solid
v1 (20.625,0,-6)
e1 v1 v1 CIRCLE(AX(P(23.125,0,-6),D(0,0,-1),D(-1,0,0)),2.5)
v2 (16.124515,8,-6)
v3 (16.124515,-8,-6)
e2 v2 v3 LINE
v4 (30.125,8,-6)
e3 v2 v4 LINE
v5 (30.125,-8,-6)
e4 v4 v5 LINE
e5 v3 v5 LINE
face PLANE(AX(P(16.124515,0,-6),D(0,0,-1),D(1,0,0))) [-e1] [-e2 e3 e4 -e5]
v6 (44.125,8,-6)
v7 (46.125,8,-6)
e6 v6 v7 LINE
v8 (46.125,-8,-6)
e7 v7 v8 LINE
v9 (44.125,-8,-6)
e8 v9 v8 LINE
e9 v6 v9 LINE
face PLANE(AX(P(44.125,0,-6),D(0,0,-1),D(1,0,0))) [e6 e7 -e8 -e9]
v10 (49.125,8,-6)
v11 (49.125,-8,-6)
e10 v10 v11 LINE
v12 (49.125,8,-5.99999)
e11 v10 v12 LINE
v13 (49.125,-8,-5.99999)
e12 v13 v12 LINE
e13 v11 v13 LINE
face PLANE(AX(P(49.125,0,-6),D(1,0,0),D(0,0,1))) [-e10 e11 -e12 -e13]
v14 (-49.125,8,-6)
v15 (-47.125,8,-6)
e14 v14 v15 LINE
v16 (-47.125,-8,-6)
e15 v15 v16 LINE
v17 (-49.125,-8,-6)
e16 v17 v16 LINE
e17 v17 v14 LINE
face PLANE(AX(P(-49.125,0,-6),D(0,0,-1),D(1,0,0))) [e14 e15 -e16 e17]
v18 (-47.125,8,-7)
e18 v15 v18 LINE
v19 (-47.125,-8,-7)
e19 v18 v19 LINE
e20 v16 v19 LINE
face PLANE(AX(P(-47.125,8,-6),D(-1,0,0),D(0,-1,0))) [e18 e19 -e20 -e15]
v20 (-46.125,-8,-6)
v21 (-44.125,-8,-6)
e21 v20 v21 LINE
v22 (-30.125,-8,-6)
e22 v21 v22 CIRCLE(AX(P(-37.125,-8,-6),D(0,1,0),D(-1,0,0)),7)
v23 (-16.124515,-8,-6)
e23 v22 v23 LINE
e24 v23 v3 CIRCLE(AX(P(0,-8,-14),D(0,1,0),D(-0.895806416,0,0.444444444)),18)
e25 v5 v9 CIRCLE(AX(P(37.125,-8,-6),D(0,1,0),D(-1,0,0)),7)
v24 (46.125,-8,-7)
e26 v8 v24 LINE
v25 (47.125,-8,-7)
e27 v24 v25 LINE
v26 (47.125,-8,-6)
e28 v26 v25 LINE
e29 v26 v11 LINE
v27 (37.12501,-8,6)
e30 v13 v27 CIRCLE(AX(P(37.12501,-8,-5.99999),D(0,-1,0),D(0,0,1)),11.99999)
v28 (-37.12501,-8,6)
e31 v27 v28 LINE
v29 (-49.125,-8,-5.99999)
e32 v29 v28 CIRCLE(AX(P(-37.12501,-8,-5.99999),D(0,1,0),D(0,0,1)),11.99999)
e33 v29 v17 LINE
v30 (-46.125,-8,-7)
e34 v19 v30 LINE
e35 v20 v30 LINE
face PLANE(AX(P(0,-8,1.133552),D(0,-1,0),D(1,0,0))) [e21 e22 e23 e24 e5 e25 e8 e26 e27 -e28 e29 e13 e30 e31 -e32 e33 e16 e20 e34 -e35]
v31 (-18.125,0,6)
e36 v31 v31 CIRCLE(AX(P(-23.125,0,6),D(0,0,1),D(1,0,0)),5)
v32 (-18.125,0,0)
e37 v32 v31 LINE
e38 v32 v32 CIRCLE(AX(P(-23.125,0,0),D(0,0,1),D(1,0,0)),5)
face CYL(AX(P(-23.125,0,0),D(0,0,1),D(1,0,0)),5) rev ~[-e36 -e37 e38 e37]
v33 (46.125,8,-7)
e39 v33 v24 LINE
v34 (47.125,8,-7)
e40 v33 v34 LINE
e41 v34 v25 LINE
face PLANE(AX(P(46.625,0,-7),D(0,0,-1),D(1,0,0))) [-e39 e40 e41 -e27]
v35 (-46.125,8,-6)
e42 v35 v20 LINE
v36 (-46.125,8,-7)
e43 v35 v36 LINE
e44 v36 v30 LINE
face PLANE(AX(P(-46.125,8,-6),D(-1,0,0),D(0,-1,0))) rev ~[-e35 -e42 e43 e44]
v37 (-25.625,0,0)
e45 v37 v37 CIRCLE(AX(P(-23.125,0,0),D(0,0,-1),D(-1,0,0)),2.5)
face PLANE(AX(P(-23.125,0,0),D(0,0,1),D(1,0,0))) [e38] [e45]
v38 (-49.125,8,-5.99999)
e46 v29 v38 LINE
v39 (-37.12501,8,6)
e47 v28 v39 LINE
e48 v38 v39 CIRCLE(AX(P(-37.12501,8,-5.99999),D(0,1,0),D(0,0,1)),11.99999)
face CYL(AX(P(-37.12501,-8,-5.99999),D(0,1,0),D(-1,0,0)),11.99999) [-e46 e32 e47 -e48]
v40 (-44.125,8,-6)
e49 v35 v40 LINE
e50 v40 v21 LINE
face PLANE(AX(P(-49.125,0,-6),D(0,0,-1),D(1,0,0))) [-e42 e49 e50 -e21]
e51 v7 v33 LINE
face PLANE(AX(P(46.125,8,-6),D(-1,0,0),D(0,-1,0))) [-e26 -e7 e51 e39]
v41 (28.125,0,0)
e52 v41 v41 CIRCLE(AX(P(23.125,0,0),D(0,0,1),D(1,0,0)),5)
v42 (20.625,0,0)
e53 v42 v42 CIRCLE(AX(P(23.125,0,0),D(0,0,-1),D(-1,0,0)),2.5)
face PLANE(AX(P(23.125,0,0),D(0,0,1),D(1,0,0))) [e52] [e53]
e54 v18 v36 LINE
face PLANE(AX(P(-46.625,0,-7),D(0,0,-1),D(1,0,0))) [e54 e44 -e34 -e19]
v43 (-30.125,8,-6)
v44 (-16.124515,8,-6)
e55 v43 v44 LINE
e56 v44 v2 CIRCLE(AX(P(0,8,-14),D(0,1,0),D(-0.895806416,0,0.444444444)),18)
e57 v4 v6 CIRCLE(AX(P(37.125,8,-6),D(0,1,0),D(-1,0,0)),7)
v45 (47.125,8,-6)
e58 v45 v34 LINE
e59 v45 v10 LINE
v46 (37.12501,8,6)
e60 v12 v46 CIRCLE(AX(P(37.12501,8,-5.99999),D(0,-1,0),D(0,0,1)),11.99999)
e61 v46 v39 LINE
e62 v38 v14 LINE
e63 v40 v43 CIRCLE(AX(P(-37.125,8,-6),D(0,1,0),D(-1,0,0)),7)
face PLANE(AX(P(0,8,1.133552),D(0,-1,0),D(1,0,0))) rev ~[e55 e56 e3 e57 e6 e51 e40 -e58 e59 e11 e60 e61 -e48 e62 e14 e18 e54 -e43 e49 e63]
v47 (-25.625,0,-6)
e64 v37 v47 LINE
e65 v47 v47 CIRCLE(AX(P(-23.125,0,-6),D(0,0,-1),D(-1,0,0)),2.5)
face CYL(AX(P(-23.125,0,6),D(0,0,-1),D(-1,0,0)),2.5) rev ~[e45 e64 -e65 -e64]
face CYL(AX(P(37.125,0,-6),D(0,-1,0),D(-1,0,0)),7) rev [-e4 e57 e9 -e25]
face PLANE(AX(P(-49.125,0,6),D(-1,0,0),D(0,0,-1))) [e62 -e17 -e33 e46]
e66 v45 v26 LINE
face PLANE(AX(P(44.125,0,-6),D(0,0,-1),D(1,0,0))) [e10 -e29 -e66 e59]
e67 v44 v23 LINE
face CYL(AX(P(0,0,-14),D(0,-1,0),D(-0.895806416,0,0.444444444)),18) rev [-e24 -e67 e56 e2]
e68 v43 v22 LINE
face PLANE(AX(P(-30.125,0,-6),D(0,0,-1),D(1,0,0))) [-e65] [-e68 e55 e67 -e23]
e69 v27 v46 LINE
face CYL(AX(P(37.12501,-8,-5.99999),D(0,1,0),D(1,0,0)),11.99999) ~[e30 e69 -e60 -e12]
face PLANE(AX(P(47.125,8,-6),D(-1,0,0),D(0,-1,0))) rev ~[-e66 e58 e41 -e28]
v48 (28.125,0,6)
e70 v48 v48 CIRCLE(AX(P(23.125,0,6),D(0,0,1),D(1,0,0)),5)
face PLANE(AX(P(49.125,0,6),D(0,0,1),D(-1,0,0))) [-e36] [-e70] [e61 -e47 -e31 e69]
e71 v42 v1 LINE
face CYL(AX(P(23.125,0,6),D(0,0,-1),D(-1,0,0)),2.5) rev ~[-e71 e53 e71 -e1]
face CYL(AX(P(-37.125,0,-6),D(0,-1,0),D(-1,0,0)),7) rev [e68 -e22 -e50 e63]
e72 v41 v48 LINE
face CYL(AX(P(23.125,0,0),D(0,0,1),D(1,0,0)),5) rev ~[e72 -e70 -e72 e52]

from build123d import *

# Parameters (mm, degrees)
F1_DEPTH       = 8
F3_D           = 5
F3_CBORE_D     = 10
F3_CBORE_DEPTH = 6
F4_R           = 11.99999
F5_W           = 1
F5_H           = 16
F6_DEPTH       = 1
F7_W           = 1
F7_H           = 16
F8_DEPTH       = 1


# Not quite as in the source:
# - a fillet or chamfer is up to 0.001 mm smaller than in the source, because OpenCascade refuses the exact size
# - a feature names something its author has since deleted; it is built from what else it names


with BuildPart() as f1:
    # F0 (on Front) → F1 (new body, symmetric)
    with BuildSketch(Plane.XZ):
        with BuildLine():
            Line((-49.125, -6), (-44.125, -6))
            ThreePointArc((-44.125, -6), (-37.125, 1), (-30.125, -6))
            Line((-30.125, -6), (-16.1245154966, -6))
            ThreePointArc((-16.1245154966, -6), (0, 4), (16.1245154966, -6))
            Line((16.1245154966, -6), (30.125, -6))
            ThreePointArc((30.125, -6), (37.125, 1), (44.125, -6))
            Line((44.125, -6), (49.125, -6))
            Line((49.125, -6), (49.125, 6))
            Line((49.125, 6), (-49.125, 6))
            Line((-49.125, 6), (-49.125, -6))
        make_face()
    extrude(amount=F1_DEPTH, both=True)

    # F3 (through all)
    with Locations(Plane.XY.offset(6)):
        with Locations((-23.125, 0), (23.125, 0)):
            CounterBoreHole(F3_D / 2, F3_CBORE_D / 2, F3_CBORE_DEPTH)

    # F4 (radius 12 in the source; OpenCascade refuses exactly that, so slightly less here)
    f4_edges = [f1.edges().sort_by_distance(p)[0] for p in [
        (49.125, 0, 6),
        (-49.125, 0, 6),
    ]]
    fillet(f4_edges, radius=F4_R)

    # F5 (on face) → F6 (join)
    with BuildSketch(Plane(origin=(0, 0, -6), x_dir=(1, 0, 0), z_dir=(0, 0, -1))):
        with Locations((-46.625, 0)):
            Rectangle(F5_W, F5_H)
    extrude(amount=F6_DEPTH)

    # F7 (on face) → F8 (join)
    with BuildSketch(Plane(origin=(0, 0, -6), x_dir=(1, 0, 0), z_dir=(0, 0, -1))):
        with Locations((46.625, 0)):
            Rectangle(F7_W, F7_H)
    extrude(amount=F8_DEPTH)


solid = f1.part
